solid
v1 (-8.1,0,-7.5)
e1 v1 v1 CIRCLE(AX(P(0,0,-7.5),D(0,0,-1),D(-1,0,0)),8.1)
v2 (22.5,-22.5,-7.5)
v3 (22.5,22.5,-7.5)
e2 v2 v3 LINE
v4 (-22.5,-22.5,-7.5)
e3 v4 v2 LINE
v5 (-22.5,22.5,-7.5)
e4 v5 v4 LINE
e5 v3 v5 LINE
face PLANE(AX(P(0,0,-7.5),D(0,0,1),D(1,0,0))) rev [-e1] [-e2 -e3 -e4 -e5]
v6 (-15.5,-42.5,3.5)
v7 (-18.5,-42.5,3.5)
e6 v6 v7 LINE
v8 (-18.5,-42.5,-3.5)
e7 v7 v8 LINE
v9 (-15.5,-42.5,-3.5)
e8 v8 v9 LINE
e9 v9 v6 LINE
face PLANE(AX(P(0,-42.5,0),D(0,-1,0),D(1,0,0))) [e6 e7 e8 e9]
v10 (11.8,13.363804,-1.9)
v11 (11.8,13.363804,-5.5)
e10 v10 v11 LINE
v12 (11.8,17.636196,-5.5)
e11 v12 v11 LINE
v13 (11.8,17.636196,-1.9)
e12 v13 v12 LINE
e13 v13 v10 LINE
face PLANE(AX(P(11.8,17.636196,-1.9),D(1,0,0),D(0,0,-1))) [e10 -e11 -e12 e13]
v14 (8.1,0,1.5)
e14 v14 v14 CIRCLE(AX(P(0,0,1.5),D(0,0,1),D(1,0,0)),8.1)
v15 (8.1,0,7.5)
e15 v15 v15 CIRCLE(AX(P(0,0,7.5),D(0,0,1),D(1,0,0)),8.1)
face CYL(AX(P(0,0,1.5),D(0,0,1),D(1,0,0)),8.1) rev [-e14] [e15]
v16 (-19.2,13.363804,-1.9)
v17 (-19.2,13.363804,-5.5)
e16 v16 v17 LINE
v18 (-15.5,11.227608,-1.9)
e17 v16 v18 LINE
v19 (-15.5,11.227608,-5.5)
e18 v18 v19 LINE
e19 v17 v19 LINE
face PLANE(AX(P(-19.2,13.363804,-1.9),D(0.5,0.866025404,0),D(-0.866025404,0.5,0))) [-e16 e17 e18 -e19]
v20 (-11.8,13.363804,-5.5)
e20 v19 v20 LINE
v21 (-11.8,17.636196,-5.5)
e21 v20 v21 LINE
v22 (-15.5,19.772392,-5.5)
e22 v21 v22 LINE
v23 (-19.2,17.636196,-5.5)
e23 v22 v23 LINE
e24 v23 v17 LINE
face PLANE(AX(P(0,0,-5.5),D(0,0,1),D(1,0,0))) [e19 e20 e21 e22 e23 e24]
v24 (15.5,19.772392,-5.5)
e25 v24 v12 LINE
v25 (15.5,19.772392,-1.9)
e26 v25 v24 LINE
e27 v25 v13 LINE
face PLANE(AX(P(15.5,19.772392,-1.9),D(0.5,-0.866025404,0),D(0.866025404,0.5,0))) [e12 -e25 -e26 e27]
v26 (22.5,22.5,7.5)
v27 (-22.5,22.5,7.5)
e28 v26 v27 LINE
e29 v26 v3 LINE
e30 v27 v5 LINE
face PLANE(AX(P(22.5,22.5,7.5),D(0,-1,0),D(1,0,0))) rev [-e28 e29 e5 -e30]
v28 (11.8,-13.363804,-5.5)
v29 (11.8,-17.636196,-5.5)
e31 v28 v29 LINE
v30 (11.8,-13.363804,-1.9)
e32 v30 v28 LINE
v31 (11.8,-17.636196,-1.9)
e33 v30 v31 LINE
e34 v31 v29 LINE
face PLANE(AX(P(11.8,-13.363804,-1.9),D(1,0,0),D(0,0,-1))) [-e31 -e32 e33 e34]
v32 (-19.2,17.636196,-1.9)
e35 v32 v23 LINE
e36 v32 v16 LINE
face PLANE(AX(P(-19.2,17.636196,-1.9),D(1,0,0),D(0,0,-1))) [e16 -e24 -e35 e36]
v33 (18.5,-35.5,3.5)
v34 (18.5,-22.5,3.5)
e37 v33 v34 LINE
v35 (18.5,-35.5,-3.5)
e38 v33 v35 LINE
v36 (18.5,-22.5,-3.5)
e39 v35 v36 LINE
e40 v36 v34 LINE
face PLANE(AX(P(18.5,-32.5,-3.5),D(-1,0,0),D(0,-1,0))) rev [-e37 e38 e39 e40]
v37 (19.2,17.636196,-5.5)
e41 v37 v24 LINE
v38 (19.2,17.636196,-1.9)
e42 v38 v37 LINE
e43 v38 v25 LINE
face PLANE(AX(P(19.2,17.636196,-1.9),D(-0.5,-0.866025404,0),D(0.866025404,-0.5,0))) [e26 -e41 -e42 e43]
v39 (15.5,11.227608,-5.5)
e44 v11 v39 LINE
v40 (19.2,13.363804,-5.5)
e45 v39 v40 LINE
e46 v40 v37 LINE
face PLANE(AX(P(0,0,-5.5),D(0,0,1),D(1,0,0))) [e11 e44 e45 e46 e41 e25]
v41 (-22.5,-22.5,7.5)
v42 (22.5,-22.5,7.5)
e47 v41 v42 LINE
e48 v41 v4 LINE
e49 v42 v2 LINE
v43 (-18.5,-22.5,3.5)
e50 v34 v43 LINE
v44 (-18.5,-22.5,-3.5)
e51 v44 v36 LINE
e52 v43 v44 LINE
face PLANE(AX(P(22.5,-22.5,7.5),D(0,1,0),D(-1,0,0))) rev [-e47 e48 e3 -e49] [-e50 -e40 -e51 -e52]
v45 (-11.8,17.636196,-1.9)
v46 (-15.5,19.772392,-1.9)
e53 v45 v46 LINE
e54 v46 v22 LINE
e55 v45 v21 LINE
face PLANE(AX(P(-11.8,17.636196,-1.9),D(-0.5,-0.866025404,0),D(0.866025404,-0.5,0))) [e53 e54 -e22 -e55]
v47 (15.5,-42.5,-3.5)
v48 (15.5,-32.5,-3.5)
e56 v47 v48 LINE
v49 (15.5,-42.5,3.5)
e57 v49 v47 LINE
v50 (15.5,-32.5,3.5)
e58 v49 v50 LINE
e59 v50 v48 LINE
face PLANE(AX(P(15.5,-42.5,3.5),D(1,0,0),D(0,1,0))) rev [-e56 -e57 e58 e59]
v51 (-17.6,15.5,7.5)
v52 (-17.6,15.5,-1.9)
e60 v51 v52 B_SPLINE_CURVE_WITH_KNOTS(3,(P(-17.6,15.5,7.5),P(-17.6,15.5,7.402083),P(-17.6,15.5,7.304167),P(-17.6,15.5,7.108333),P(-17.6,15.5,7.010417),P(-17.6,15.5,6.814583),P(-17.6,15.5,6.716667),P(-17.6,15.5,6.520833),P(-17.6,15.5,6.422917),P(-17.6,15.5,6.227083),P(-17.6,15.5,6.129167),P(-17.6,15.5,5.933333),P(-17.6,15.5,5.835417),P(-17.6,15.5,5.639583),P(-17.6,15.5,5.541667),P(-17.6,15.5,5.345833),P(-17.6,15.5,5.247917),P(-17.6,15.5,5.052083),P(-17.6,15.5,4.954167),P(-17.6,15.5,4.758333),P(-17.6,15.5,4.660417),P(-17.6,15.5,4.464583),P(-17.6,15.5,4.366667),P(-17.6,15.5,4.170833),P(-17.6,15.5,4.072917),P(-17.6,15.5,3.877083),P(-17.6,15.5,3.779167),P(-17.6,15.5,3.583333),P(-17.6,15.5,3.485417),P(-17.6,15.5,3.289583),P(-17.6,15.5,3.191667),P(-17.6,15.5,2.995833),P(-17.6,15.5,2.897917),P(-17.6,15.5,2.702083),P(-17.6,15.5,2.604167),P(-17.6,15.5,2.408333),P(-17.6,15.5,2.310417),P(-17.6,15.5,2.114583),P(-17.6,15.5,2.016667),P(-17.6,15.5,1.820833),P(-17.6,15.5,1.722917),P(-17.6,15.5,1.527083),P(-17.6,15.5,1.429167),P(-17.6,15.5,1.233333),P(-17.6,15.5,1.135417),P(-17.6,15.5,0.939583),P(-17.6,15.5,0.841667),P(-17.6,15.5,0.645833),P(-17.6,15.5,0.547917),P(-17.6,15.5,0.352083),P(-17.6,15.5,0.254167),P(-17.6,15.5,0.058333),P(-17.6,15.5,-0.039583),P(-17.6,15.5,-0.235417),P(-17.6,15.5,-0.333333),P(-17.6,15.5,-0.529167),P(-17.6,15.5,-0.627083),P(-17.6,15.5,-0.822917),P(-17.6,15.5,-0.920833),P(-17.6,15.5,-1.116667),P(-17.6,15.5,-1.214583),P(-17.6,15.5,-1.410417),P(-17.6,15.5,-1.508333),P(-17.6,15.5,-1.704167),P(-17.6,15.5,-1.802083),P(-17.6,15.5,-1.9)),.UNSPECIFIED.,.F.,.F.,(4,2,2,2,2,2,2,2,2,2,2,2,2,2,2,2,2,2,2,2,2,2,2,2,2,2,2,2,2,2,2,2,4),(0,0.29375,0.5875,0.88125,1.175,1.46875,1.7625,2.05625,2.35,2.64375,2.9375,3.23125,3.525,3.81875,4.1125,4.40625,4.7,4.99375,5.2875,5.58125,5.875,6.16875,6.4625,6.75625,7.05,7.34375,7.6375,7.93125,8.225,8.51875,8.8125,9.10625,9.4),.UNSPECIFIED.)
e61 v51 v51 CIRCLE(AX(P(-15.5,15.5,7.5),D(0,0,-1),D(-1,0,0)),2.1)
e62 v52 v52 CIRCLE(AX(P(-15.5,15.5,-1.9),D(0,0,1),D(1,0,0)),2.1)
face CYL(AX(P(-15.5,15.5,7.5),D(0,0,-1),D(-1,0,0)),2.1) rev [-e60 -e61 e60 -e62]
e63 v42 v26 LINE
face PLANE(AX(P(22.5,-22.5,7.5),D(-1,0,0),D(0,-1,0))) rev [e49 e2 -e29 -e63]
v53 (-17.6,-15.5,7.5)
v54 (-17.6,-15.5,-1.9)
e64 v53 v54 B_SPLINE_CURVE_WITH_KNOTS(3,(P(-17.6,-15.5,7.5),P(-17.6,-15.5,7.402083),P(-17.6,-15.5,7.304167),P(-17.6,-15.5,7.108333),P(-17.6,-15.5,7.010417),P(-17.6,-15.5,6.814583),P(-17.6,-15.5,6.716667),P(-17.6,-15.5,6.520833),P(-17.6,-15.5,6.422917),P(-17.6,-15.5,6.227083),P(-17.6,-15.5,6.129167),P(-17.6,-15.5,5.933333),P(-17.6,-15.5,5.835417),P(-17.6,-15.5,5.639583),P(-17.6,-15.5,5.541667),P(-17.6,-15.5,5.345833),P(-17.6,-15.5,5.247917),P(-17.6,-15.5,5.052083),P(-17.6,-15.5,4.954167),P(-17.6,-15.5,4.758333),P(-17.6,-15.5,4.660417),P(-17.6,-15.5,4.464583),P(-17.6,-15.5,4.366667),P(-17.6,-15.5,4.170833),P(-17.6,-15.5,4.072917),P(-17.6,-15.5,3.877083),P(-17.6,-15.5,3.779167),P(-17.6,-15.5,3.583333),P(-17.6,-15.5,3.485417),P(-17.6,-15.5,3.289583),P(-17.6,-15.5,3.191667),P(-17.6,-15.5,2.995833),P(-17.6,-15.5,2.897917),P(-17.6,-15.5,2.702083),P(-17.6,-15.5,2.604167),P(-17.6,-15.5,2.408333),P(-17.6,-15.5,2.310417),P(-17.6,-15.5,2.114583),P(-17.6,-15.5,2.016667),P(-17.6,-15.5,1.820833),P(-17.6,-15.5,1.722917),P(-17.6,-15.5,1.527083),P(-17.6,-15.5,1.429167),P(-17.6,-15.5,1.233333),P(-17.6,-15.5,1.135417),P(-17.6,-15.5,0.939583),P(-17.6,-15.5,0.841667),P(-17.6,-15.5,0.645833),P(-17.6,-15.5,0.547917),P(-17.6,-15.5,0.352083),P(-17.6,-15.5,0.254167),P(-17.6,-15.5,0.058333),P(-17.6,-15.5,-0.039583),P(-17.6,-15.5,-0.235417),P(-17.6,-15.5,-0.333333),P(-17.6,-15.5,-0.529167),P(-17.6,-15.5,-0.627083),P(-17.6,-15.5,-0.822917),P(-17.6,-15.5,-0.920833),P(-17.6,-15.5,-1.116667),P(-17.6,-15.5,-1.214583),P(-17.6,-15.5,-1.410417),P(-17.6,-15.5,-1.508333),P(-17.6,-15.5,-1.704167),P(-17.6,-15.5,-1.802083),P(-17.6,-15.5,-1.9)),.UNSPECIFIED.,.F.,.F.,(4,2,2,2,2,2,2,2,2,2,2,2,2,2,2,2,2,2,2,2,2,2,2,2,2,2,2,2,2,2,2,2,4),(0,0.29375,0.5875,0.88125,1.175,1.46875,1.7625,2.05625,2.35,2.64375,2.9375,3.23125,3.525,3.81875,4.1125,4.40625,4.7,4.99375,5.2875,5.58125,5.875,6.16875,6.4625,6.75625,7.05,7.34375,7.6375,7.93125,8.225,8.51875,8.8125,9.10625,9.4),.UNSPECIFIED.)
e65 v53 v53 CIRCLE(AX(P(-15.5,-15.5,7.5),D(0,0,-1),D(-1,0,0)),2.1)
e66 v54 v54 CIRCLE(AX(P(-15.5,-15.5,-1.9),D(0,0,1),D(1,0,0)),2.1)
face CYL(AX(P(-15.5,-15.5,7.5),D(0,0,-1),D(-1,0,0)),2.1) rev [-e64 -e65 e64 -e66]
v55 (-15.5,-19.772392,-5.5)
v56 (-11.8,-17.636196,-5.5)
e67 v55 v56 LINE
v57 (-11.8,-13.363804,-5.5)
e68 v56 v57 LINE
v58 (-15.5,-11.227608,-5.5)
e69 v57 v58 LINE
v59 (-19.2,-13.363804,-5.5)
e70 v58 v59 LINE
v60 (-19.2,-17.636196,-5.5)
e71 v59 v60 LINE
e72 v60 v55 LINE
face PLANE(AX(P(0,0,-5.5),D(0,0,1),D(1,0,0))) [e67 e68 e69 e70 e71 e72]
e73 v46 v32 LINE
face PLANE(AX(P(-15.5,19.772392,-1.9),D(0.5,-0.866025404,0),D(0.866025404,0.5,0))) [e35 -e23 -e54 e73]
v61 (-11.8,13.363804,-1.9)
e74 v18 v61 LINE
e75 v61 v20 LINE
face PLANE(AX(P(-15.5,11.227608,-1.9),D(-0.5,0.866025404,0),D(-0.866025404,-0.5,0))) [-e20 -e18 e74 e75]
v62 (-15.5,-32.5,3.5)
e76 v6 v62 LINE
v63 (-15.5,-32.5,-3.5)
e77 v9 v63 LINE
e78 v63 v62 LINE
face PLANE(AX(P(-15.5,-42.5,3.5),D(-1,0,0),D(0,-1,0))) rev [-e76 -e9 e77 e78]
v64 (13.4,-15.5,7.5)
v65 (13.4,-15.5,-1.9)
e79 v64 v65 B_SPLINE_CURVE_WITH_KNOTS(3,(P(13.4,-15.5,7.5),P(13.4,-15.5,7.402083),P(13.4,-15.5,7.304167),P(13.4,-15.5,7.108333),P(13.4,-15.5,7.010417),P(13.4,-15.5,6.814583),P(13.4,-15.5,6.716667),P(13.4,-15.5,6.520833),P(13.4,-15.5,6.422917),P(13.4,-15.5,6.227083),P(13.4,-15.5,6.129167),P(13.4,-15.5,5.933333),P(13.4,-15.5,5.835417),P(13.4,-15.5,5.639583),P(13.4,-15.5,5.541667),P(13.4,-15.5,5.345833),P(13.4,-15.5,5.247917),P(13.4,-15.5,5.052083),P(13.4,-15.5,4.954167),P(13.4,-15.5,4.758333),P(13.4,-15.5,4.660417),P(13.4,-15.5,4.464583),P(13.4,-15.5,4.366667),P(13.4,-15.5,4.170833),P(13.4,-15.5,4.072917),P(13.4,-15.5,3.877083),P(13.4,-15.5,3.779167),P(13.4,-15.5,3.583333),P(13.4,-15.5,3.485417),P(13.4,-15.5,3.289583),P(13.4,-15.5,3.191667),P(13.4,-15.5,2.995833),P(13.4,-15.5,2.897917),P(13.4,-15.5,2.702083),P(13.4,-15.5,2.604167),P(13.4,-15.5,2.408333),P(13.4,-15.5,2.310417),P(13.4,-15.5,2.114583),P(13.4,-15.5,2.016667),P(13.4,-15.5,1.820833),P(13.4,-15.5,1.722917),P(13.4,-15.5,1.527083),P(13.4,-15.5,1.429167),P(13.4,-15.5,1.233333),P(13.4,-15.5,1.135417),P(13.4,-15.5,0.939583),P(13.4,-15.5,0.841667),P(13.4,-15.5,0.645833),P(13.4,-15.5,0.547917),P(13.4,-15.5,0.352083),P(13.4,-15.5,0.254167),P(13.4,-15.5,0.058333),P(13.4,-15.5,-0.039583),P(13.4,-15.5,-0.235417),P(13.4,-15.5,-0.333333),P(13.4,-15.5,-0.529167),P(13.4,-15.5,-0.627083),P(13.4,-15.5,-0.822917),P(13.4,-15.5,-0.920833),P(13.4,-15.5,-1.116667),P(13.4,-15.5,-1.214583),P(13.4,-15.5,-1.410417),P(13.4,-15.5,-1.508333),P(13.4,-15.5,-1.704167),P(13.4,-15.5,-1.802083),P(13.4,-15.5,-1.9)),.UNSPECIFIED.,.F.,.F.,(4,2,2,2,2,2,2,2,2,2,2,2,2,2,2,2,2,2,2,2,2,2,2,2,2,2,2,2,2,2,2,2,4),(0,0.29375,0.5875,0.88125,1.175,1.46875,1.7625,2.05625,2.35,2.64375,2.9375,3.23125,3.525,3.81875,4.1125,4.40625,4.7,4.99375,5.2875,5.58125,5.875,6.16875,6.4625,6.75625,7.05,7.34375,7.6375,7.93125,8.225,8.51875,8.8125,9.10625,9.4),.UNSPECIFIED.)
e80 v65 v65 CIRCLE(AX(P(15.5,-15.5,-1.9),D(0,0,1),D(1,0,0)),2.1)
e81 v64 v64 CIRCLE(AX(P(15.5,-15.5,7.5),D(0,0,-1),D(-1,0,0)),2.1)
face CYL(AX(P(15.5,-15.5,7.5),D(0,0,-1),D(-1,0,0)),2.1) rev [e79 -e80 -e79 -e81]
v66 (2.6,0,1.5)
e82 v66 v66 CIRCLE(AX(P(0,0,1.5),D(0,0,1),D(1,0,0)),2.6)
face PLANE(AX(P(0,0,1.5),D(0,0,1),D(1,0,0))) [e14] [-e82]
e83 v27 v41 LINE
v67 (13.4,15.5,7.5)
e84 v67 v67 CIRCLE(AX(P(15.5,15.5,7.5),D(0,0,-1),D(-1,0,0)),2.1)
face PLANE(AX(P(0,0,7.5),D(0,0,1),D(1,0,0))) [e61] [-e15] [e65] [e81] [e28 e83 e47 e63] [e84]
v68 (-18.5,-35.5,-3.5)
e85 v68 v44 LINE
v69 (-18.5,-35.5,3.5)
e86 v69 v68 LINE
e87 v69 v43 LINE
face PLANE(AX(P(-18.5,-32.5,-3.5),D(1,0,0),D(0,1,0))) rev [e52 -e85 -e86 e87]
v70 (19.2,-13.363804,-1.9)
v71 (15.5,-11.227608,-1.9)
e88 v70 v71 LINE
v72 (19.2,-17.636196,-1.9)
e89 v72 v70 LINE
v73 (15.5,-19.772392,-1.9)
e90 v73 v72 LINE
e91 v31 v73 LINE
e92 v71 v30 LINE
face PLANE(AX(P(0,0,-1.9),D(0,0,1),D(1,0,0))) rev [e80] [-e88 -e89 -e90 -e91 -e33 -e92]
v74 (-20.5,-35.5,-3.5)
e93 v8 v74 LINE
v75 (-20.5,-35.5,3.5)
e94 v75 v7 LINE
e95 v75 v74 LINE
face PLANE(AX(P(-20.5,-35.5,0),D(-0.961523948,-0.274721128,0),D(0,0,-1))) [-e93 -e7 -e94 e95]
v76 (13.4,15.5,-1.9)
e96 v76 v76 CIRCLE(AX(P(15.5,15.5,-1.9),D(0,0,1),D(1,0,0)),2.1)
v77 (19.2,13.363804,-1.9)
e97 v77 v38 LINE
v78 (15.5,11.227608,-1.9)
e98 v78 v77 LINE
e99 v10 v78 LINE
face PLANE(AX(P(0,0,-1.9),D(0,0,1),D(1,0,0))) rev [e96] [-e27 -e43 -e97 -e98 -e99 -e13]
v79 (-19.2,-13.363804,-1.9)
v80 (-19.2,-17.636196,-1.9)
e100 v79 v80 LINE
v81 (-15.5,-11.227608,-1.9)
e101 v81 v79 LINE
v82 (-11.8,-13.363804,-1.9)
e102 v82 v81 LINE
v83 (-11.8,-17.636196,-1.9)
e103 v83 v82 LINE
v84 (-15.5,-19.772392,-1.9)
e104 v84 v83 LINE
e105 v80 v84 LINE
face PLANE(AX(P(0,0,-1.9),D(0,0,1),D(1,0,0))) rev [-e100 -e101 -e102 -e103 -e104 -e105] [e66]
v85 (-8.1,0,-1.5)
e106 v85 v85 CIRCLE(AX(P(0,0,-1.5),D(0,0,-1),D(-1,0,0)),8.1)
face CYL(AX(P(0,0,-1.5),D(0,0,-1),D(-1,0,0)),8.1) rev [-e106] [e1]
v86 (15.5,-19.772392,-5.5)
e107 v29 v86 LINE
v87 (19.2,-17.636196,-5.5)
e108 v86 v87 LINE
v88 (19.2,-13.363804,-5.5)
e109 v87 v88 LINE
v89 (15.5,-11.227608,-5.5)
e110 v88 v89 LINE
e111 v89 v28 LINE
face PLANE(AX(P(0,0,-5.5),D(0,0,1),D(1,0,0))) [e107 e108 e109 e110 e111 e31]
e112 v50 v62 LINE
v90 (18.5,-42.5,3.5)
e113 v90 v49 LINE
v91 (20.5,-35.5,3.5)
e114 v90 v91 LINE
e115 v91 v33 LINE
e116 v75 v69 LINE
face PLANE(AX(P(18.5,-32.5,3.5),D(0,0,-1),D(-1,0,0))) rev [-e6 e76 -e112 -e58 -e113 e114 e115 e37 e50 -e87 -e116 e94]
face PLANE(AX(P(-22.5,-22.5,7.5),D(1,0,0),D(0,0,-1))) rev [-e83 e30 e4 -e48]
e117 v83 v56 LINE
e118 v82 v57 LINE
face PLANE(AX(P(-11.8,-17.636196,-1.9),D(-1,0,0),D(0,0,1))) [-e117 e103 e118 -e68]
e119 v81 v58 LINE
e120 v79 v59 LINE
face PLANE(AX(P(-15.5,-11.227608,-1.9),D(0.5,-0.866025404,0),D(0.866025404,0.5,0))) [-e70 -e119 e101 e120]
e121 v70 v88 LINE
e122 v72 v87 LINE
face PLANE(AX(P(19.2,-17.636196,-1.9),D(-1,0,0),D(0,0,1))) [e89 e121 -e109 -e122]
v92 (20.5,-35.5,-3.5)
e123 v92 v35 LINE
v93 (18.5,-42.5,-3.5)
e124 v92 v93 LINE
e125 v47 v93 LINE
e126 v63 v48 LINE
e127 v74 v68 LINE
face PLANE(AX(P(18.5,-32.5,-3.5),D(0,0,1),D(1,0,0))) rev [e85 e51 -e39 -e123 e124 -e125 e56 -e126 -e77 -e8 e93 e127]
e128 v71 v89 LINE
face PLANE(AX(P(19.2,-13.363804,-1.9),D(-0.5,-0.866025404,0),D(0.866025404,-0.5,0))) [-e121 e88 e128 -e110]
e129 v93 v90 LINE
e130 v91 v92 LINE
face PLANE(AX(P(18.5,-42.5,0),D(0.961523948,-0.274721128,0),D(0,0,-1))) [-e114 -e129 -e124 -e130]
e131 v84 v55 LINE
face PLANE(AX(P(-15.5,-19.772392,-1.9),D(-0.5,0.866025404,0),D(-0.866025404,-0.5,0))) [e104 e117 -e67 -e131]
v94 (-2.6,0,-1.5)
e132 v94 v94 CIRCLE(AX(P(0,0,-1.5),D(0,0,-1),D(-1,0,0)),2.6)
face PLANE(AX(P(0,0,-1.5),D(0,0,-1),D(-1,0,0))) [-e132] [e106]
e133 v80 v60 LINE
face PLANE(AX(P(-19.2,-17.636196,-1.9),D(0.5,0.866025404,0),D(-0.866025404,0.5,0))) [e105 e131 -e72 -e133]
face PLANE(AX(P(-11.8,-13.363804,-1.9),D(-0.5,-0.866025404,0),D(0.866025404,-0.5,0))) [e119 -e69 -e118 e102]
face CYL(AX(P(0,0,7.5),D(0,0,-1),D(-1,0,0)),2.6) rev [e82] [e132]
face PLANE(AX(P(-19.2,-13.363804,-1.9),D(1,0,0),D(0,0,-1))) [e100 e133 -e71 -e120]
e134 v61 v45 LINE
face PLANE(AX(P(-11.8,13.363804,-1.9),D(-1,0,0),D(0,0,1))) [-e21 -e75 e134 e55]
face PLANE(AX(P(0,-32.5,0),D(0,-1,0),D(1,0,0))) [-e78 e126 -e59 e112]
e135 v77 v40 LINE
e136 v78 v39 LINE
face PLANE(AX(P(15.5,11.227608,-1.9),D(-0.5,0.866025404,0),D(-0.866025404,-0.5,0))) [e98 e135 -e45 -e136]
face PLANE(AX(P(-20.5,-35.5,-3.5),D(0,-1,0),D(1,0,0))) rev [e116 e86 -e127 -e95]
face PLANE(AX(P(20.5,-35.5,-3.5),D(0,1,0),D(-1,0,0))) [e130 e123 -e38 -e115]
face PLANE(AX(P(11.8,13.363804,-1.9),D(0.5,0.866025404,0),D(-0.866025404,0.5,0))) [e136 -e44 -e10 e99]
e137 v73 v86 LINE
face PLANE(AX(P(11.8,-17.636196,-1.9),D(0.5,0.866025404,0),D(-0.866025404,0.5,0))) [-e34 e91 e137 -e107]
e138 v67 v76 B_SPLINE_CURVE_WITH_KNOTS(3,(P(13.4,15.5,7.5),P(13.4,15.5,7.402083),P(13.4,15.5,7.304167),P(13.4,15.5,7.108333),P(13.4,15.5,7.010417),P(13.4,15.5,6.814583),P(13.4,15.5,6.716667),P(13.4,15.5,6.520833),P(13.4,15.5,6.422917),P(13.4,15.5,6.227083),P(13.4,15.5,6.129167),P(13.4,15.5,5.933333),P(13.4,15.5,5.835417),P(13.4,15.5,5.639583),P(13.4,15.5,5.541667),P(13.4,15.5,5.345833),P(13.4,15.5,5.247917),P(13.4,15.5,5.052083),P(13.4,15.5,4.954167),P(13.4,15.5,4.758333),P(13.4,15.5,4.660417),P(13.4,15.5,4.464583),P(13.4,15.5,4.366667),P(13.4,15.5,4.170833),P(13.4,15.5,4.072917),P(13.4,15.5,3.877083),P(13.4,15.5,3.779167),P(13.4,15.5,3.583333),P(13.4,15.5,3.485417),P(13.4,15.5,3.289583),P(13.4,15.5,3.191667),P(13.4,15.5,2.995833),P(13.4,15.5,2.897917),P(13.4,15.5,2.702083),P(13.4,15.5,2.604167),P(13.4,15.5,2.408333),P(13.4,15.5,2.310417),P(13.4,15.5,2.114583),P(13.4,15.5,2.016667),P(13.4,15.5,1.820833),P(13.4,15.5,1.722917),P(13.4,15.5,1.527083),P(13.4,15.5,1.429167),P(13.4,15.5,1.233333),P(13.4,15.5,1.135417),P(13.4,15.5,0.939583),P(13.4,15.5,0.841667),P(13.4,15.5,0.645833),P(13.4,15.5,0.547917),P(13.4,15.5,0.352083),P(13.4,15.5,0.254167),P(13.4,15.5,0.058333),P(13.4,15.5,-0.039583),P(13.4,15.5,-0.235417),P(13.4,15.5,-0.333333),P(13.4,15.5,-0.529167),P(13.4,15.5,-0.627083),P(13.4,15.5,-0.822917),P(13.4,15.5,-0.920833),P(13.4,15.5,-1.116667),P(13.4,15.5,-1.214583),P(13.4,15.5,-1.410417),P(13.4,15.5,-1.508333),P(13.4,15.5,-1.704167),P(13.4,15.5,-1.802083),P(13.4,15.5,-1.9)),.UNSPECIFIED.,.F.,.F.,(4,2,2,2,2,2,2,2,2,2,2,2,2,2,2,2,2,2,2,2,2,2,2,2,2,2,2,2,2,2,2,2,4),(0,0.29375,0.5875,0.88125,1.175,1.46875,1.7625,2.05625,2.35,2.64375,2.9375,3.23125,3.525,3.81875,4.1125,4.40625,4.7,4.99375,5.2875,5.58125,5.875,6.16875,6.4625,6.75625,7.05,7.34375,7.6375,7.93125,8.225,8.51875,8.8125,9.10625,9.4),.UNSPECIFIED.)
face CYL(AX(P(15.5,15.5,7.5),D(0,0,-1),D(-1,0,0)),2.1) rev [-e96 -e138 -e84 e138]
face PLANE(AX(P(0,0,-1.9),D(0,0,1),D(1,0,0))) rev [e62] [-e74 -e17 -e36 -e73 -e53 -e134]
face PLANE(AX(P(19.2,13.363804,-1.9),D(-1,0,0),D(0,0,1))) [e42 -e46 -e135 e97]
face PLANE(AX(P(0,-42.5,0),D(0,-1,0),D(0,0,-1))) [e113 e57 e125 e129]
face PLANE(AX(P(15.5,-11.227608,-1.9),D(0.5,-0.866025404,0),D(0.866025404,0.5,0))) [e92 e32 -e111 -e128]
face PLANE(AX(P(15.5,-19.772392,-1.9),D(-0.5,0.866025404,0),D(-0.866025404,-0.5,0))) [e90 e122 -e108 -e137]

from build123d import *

# Parameters (mm, degrees)
SKETCH1_W           = 45
SKETCH1_H           = 45
SKETCH1_R           = 2.6
BOSS_EXTRUDE1_DEPTH = 7.5
SKETCH2_R           = 8.1
CUT_EXTRUDE1_DEPTH  = 6
CUT_EXTRUDE4_START  = -6
SKETCH5_R           = 8.1
CUT_EXTRUDE4_DEPTH  = 6
SKETCH7_W           = 37
SKETCH7_H           = 7
BOSS_EXTRUDE2_DEPTH = 10
CUT_EXTRUDE6_START  = 2
CUT_EXTRUDE6_DEPTH  = 3.6
CUT_EXTRUDE7_START  = -2
SKETCH8_R           = 2.1
CUT_EXTRUDE7_DEPTH  = 41.278836313
SKETCH9_W           = 3
SKETCH9_H           = 7
BOSS_EXTRUDE3_DEPTH = 10
SKETCH10_W          = 7
SKETCH10_H          = 7
BOSS_EXTRUDE4_DEPTH = 2
CHAMFER2_SIZE2      = 7
CHAMFER2_SIZE       = 2
CHAMFER3_SIZE2      = 7
CHAMFER3_SIZE       = 2


with BuildPart() as part:
    # Sketch1 → Boss-Extrude1 (new, symmetric)
    with BuildSketch(Plane.XY):
        Rectangle(SKETCH1_W, SKETCH1_H)
        Circle(SKETCH1_R, mode=Mode.SUBTRACT)
    extrude(amount=BOSS_EXTRUDE1_DEPTH, both=True)

    # Sketch2 → Cut-Extrude1 (cut)
    with BuildSketch(Plane.XY.offset(7.5)):
        Circle(SKETCH2_R)
    extrude(amount=-CUT_EXTRUDE1_DEPTH, mode=Mode.SUBTRACT)

    # Sketch5 → Cut-Extrude4 (cut)
    with BuildSketch(Plane(origin=(0, 0, -7.5), x_dir=(-1, 0, 0), z_dir=(0, 0, -1)).offset(CUT_EXTRUDE4_START)):
        with Locations(Location((0, 0, 0), (0, 0, 180))):
            Circle(SKETCH5_R)
    extrude(amount=CUT_EXTRUDE4_DEPTH, mode=Mode.SUBTRACT)

    # Sketch7 → Boss-Extrude2 (add)
    with BuildSketch(Plane.XZ.offset(22.5)):
        Rectangle(SKETCH7_W, SKETCH7_H)
    extrude(amount=BOSS_EXTRUDE2_DEPTH)

    # Sketch6 → Cut-Extrude6 (cut)
    with BuildSketch(Plane.XY.offset(-7.5).offset(CUT_EXTRUDE6_START)):
        Polygon((19.2, 17.636195996), (15.5, 19.772391992), (11.8, 17.636195996), (11.8, 13.363804004), (15.5, 11.227608008), (19.2, 13.363804004), align=None)
        Polygon((-11.8, 17.636195996), (-15.5, 19.772391992), (-19.2, 17.636195996), (-19.2, 13.363804004), (-15.5, 11.227608008), (-11.8, 13.363804004), align=None)
        Polygon((19.2, -13.363804004), (15.5, -11.227608008), (11.8, -13.363804004), (11.8, -17.636195996), (15.5, -19.772391992), (19.2, -17.636195996), align=None)
        Polygon((-11.8, -13.363804004), (-15.5, -11.227608008), (-19.2, -13.363804004), (-19.2, -17.636195996), (-15.5, -19.772391992), (-11.8, -17.636195996), align=None)
    extrude(amount=CUT_EXTRUDE6_DEPTH, mode=Mode.SUBTRACT)

    # Sketch8 → Cut-Extrude7 (cut, through all)
    with BuildSketch(Plane(origin=(0, 0, -7.5), x_dir=(-1, 0, 0), z_dir=(0, 0, -1)).offset(CUT_EXTRUDE7_START)):
        with Locations((-15.5, 15.5)):
            Circle(SKETCH8_R)
        with Locations((15.5, 15.5)):
            Circle(SKETCH8_R)
        with Locations((15.5, -15.5)):
            Circle(SKETCH8_R)
        with Locations((-15.5, -15.5)):
            Circle(SKETCH8_R)
    extrude(amount=-CUT_EXTRUDE7_DEPTH, mode=Mode.SUBTRACT)

    # Sketch9 → Boss-Extrude3 (add)
    with BuildSketch(Plane.XZ.offset(32.5)):
        with Locations((-17, 0)):
            Rectangle(SKETCH9_W, SKETCH9_H)
        with Locations((17, 0)):
            Rectangle(SKETCH9_W, SKETCH9_H)
    extrude(amount=BOSS_EXTRUDE3_DEPTH)

    # Sketch10 → Boss-Extrude4 (add)
    with BuildSketch(Plane.ZY.offset(18.5)):
        with Locations((0, -39)):
            Rectangle(SKETCH10_W, SKETCH10_H)
    boss_extrude4 = extrude(amount=BOSS_EXTRUDE4_DEPTH)

    # Mirror1: Boss-Extrude4 across plane
    add(boss_extrude4.mirror(Plane(origin=(0, 0, 0), x_dir=(0, 0, 1), z_dir=(1, 0, 0))))

    # Chamfer2
    chamfer2_edges = [part.edges().sort_by_distance(p)[0] for p in [
        (-20.5, -42.5, 0),
    ]]
    chamfer2_side = [part.faces().sort_by_distance(p)[0] for p in [
        (-20.46, -42.5, 0),
    ]]
    chamfer(chamfer2_edges, length=CHAMFER2_SIZE - 0.0001, length2=CHAMFER2_SIZE2 - 0.0001, reference=chamfer2_side[0])  # a hair under: the kernel refuses the full size

    # Chamfer3
    chamfer3_edges = [part.edges().sort_by_distance(p)[0] for p in [
        (20.5, -42.5, 0),
    ]]
    chamfer3_side = [part.faces().sort_by_distance(p)[0] for p in [
        (20.46, -42.5, 0),
    ]]
    chamfer(chamfer3_edges, length=CHAMFER3_SIZE - 0.0001, length2=CHAMFER3_SIZE2 - 0.0001, reference=chamfer3_side[0])  # a hair under: the kernel refuses the full size


solid = part.part
